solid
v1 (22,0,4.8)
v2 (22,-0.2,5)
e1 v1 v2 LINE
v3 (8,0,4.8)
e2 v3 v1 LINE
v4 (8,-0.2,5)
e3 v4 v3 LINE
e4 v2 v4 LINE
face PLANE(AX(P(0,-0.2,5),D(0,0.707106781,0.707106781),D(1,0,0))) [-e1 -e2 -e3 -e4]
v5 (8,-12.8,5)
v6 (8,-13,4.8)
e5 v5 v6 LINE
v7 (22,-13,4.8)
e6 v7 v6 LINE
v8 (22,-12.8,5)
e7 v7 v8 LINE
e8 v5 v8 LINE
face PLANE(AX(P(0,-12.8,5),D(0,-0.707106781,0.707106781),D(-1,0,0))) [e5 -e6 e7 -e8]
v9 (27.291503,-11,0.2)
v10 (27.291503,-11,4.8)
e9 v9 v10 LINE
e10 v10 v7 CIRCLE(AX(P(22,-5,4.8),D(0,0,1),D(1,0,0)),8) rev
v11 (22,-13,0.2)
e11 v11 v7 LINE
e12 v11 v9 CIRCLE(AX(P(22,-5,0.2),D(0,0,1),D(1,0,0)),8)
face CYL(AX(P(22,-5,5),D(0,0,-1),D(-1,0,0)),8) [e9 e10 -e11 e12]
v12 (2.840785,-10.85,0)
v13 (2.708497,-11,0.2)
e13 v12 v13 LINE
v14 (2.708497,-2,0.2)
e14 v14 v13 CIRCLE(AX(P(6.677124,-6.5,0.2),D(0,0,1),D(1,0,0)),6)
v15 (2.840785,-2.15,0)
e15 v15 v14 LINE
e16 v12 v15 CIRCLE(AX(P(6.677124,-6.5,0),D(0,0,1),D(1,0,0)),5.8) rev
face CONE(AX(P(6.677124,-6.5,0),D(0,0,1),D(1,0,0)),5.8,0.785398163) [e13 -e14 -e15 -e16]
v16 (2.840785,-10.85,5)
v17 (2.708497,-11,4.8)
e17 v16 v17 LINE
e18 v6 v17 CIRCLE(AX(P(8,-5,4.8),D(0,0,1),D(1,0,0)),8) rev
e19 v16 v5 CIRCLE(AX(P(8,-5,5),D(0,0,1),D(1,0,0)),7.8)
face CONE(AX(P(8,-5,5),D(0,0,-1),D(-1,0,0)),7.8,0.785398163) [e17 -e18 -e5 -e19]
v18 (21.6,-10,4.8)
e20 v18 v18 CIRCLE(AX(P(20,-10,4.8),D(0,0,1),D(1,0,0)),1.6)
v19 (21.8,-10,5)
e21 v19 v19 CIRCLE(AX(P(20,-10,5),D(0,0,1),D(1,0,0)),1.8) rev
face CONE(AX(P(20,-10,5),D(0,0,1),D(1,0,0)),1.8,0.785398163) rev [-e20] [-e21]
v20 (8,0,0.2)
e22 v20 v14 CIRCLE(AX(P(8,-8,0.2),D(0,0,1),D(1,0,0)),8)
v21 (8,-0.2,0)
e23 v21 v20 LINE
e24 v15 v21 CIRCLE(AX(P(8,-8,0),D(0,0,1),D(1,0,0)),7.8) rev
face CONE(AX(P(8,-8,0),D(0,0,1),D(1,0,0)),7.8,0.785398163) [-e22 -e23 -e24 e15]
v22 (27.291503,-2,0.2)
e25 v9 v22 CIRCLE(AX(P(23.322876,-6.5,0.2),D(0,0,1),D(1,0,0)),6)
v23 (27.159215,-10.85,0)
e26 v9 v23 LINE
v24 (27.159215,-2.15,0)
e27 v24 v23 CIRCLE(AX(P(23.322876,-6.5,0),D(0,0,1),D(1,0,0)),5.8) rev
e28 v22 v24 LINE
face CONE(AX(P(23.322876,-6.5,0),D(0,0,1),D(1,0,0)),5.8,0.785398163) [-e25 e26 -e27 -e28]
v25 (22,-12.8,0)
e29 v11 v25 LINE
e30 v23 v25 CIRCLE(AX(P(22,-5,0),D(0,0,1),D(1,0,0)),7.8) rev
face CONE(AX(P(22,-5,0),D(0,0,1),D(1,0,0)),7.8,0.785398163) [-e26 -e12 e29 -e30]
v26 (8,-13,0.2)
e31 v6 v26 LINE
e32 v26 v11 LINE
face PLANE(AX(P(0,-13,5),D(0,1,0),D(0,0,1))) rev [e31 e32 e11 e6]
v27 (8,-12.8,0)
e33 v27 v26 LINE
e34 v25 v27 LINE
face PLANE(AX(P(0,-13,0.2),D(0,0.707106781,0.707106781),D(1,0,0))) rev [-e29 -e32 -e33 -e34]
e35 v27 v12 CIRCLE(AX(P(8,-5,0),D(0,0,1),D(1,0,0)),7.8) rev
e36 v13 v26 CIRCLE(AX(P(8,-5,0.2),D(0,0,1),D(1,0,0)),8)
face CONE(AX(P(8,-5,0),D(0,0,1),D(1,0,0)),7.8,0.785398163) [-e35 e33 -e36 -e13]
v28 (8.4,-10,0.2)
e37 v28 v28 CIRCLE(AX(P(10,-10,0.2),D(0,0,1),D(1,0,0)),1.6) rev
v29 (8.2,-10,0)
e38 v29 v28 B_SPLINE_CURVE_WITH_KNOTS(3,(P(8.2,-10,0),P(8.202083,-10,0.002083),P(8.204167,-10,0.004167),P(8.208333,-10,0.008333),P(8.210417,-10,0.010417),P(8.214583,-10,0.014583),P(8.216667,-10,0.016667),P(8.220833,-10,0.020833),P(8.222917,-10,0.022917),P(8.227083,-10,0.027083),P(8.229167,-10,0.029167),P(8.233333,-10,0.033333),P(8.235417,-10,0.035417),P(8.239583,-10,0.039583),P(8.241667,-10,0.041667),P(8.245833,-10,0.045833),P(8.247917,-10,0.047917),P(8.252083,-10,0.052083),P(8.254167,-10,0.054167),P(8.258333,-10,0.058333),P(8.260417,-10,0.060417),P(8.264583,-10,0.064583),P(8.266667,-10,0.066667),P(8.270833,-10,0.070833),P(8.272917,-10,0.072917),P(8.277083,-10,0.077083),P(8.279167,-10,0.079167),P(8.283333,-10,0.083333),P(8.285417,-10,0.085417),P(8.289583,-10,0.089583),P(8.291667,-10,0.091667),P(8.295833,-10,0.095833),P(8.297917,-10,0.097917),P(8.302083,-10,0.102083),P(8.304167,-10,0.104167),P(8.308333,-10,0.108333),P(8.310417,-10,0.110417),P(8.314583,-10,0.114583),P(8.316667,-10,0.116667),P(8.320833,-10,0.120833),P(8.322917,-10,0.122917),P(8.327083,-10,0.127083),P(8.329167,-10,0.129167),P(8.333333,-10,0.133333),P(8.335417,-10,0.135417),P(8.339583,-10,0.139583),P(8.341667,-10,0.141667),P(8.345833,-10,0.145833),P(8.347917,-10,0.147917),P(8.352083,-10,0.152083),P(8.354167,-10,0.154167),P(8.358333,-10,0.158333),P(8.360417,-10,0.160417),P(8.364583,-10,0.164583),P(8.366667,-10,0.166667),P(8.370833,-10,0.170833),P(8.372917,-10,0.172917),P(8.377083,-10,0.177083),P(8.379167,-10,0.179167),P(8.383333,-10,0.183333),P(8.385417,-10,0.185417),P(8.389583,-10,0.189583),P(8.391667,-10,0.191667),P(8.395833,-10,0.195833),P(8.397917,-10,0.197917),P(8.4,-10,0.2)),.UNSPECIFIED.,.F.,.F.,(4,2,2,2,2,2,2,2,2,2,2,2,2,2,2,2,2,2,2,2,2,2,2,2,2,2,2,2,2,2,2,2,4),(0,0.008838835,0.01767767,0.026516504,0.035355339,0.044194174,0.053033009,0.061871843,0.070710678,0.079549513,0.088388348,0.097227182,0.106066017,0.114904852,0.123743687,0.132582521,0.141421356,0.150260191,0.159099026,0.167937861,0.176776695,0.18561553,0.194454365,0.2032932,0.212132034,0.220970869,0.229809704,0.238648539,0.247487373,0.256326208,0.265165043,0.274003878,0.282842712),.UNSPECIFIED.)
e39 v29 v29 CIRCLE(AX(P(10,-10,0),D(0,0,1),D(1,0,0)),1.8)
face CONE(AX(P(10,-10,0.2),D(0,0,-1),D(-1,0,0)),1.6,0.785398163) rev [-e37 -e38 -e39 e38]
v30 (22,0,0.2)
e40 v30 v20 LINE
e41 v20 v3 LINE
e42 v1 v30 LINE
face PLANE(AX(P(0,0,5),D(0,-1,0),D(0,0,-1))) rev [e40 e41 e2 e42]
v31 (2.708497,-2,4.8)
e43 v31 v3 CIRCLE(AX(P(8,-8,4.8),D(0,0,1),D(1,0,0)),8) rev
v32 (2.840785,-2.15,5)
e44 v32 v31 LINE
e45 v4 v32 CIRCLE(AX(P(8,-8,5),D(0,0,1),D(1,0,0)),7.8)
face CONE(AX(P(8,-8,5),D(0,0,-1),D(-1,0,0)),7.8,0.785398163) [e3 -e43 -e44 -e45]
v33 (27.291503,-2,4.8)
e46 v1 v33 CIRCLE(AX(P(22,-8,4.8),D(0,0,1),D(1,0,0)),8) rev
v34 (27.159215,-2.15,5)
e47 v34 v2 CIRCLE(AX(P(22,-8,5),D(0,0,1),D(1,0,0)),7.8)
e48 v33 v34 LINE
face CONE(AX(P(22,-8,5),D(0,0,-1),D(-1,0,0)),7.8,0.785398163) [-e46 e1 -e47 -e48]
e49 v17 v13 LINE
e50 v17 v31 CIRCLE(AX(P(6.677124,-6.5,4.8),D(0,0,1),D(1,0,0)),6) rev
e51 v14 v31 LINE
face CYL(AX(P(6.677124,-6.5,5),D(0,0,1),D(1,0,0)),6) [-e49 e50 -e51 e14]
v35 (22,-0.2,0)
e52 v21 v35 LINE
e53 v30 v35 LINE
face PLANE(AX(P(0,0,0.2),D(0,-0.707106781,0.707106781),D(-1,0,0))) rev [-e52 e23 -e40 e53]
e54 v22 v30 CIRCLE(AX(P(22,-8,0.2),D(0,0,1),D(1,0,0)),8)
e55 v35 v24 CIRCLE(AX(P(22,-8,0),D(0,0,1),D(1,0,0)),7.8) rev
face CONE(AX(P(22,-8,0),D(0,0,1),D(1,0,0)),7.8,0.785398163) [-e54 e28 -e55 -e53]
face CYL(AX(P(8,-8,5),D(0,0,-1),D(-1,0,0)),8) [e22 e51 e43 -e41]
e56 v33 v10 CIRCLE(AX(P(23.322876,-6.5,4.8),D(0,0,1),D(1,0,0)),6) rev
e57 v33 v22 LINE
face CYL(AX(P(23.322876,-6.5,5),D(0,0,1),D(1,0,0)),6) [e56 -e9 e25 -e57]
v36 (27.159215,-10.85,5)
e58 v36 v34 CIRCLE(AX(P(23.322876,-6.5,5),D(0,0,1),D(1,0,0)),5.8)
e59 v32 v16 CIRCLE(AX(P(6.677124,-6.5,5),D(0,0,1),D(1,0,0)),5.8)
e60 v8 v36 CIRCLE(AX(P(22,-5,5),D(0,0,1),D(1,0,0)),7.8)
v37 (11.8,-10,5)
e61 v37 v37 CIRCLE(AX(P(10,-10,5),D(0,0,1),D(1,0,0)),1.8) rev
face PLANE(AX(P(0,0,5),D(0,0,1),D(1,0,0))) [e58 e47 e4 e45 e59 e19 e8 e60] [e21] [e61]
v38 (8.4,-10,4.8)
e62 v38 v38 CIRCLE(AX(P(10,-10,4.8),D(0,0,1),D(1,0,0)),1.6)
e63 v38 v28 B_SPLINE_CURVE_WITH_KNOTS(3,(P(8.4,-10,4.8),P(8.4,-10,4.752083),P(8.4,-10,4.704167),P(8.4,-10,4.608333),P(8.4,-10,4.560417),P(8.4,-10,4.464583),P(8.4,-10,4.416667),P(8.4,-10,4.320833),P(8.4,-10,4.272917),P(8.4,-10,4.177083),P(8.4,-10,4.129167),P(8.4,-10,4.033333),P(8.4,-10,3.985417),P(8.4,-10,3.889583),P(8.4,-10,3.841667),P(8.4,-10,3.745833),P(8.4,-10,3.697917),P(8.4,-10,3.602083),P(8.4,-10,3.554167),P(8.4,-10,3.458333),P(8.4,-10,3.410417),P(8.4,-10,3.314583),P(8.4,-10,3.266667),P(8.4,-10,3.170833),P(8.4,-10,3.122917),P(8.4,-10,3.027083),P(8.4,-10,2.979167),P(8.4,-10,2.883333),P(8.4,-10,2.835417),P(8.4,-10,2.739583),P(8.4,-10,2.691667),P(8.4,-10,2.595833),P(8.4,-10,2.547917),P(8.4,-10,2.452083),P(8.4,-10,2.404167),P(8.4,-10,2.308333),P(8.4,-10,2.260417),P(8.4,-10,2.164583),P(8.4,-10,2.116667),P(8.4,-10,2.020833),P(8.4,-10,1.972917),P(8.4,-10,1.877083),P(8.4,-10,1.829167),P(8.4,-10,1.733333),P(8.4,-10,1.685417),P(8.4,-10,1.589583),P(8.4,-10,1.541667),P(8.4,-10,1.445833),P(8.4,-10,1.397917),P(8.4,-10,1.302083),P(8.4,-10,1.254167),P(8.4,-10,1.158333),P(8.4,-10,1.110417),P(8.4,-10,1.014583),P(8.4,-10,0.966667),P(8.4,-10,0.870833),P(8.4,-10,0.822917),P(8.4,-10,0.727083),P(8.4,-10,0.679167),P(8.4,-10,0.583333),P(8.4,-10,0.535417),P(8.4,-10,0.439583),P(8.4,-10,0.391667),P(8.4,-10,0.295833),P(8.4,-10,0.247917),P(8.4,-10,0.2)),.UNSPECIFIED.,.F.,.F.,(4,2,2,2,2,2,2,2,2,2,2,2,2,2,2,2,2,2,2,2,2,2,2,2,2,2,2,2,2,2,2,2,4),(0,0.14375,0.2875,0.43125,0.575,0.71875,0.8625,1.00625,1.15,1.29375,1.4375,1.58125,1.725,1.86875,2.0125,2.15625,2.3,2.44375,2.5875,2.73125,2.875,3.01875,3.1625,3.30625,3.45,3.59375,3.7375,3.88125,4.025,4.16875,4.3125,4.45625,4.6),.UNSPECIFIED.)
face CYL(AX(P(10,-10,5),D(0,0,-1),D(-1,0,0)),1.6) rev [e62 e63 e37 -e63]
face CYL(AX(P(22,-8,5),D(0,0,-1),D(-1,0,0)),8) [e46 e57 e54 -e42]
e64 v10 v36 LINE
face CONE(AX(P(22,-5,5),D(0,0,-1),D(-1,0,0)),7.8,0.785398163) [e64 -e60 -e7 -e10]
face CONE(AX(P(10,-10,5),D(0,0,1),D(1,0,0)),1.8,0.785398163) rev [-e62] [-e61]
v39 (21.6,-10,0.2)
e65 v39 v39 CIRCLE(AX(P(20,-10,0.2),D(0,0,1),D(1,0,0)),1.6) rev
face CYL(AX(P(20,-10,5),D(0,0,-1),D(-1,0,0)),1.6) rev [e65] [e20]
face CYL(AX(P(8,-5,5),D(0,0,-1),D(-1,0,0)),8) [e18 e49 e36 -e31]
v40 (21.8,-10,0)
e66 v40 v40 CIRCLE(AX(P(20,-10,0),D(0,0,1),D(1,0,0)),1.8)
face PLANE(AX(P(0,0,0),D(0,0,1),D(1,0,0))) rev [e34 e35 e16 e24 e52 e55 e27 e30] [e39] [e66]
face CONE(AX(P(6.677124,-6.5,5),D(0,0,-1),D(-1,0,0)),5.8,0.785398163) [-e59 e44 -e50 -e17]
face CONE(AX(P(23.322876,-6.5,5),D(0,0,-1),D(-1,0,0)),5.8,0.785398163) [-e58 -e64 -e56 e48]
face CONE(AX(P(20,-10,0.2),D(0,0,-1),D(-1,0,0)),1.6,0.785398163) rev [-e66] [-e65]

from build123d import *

# Parameters (mm, degrees)
SKETCH1_W           = 30
SKETCH1_H           = 13
BOSS_EXTRUDE1_DEPTH = 5
SKETCH2_R           = 1.6
CUT_EXTRUDE1_DEPTH  = 34.075670817
FILLET1_R           = 8
FILLET_2_R          = 6
CHAMFER_1_SIZE      = 0.2


with BuildPart() as part:
    # Sketch1 → Boss-Extrude1 (new body)
    with BuildSketch(Plane.XY):
        with Locations((15, -6.5)):
            Rectangle(SKETCH1_W, SKETCH1_H)
    extrude(amount=BOSS_EXTRUDE1_DEPTH)

    # Sketch2 → Cut-Extrude1 (cut, through all)
    with BuildSketch(Plane(origin=(0, 0, 0), x_dir=(-1, 0, 0), z_dir=(0, 0, -1))):
        with Locations((-20, -10)):
            Circle(SKETCH2_R)
        with Locations((-10, -10)):
            Circle(SKETCH2_R)
    extrude(amount=-CUT_EXTRUDE1_DEPTH, mode=Mode.SUBTRACT)

    # Fillet1
    # the kernel refuses this fillet: 8 mm, written as the material it takes off along each edge
    with BuildSketch(Plane(origin=(0, 0, -20), x_dir=(1, 0, 0), z_dir=(0, 0, 1)), Plane(origin=(0, -13, -20), x_dir=(0, 1, 0), z_dir=(0, 0, 1))) as fillet1_piece_1:
        with BuildLine():
            CenterArc((FILLET1_R, -FILLET1_R), FILLET1_R, 90, 90)
            Line((0, -FILLET1_R), (0, 0))
            Line((0, 0), (FILLET1_R, 0))
        make_face()
    extrude(amount=45, mode=Mode.SUBTRACT)
    with BuildSketch(Plane(origin=(30, -13, -20), x_dir=(0, 1, 0), z_dir=(0, 0, 1)), Plane(origin=(30, 0, -20), x_dir=(-1, 0, 0), z_dir=(0, 0, 1))) as fillet1_piece_2:
        with BuildLine():
            CenterArc((FILLET1_R, FILLET1_R), FILLET1_R, 180, 90)
            Line((0, FILLET1_R), (0, 0))
            Line((0, 0), (FILLET1_R, 0))
        make_face()
    extrude(amount=45, mode=Mode.SUBTRACT)

    # 圆角2
    fillet_2_edges = [part.edges().sort_by_distance(p)[0] for p in [
        (0.141883177, -6.5, 2.5),
        (29.858116823, -6.5, 2.5),
    ]]
    fillet(fillet_2_edges, radius=FILLET_2_R)

    # 倒角1
    chamfer_1_edges = [part.edges().sort_by_distance(p)[0] for p in [
        (21.6, -10, 5),
        (21.6, -10, 0),
        (11.6, -10, 5),
        (11.6, -10, 0),
        (15, 0, 0),
        (15, -13, 0),
        (24.828427125, -0.516685226, 0),
        (5.171572875, -12.483314774, 0),
        (15, 0, 5),
        (15, -13, 5),
        (24.828427125, -12.483314774, 5),
        (5.171572875, -0.516685226, 5),
        (24.828427125, -12.483314774, 0),
        (5.171572875, -12.483314774, 5),
        (24.828427125, -0.516685226, 5),
        (0.677124344, -6.5, 5),
        (29.322875656, -6.5, 5),
        (5.171572875, -0.516685226, 0),
        (0.677124344, -6.5, 0),
        (29.322875656, -6.5, 0),
    ]]
    chamfer(chamfer_1_edges, length=CHAMFER_1_SIZE)


solid = part.part
